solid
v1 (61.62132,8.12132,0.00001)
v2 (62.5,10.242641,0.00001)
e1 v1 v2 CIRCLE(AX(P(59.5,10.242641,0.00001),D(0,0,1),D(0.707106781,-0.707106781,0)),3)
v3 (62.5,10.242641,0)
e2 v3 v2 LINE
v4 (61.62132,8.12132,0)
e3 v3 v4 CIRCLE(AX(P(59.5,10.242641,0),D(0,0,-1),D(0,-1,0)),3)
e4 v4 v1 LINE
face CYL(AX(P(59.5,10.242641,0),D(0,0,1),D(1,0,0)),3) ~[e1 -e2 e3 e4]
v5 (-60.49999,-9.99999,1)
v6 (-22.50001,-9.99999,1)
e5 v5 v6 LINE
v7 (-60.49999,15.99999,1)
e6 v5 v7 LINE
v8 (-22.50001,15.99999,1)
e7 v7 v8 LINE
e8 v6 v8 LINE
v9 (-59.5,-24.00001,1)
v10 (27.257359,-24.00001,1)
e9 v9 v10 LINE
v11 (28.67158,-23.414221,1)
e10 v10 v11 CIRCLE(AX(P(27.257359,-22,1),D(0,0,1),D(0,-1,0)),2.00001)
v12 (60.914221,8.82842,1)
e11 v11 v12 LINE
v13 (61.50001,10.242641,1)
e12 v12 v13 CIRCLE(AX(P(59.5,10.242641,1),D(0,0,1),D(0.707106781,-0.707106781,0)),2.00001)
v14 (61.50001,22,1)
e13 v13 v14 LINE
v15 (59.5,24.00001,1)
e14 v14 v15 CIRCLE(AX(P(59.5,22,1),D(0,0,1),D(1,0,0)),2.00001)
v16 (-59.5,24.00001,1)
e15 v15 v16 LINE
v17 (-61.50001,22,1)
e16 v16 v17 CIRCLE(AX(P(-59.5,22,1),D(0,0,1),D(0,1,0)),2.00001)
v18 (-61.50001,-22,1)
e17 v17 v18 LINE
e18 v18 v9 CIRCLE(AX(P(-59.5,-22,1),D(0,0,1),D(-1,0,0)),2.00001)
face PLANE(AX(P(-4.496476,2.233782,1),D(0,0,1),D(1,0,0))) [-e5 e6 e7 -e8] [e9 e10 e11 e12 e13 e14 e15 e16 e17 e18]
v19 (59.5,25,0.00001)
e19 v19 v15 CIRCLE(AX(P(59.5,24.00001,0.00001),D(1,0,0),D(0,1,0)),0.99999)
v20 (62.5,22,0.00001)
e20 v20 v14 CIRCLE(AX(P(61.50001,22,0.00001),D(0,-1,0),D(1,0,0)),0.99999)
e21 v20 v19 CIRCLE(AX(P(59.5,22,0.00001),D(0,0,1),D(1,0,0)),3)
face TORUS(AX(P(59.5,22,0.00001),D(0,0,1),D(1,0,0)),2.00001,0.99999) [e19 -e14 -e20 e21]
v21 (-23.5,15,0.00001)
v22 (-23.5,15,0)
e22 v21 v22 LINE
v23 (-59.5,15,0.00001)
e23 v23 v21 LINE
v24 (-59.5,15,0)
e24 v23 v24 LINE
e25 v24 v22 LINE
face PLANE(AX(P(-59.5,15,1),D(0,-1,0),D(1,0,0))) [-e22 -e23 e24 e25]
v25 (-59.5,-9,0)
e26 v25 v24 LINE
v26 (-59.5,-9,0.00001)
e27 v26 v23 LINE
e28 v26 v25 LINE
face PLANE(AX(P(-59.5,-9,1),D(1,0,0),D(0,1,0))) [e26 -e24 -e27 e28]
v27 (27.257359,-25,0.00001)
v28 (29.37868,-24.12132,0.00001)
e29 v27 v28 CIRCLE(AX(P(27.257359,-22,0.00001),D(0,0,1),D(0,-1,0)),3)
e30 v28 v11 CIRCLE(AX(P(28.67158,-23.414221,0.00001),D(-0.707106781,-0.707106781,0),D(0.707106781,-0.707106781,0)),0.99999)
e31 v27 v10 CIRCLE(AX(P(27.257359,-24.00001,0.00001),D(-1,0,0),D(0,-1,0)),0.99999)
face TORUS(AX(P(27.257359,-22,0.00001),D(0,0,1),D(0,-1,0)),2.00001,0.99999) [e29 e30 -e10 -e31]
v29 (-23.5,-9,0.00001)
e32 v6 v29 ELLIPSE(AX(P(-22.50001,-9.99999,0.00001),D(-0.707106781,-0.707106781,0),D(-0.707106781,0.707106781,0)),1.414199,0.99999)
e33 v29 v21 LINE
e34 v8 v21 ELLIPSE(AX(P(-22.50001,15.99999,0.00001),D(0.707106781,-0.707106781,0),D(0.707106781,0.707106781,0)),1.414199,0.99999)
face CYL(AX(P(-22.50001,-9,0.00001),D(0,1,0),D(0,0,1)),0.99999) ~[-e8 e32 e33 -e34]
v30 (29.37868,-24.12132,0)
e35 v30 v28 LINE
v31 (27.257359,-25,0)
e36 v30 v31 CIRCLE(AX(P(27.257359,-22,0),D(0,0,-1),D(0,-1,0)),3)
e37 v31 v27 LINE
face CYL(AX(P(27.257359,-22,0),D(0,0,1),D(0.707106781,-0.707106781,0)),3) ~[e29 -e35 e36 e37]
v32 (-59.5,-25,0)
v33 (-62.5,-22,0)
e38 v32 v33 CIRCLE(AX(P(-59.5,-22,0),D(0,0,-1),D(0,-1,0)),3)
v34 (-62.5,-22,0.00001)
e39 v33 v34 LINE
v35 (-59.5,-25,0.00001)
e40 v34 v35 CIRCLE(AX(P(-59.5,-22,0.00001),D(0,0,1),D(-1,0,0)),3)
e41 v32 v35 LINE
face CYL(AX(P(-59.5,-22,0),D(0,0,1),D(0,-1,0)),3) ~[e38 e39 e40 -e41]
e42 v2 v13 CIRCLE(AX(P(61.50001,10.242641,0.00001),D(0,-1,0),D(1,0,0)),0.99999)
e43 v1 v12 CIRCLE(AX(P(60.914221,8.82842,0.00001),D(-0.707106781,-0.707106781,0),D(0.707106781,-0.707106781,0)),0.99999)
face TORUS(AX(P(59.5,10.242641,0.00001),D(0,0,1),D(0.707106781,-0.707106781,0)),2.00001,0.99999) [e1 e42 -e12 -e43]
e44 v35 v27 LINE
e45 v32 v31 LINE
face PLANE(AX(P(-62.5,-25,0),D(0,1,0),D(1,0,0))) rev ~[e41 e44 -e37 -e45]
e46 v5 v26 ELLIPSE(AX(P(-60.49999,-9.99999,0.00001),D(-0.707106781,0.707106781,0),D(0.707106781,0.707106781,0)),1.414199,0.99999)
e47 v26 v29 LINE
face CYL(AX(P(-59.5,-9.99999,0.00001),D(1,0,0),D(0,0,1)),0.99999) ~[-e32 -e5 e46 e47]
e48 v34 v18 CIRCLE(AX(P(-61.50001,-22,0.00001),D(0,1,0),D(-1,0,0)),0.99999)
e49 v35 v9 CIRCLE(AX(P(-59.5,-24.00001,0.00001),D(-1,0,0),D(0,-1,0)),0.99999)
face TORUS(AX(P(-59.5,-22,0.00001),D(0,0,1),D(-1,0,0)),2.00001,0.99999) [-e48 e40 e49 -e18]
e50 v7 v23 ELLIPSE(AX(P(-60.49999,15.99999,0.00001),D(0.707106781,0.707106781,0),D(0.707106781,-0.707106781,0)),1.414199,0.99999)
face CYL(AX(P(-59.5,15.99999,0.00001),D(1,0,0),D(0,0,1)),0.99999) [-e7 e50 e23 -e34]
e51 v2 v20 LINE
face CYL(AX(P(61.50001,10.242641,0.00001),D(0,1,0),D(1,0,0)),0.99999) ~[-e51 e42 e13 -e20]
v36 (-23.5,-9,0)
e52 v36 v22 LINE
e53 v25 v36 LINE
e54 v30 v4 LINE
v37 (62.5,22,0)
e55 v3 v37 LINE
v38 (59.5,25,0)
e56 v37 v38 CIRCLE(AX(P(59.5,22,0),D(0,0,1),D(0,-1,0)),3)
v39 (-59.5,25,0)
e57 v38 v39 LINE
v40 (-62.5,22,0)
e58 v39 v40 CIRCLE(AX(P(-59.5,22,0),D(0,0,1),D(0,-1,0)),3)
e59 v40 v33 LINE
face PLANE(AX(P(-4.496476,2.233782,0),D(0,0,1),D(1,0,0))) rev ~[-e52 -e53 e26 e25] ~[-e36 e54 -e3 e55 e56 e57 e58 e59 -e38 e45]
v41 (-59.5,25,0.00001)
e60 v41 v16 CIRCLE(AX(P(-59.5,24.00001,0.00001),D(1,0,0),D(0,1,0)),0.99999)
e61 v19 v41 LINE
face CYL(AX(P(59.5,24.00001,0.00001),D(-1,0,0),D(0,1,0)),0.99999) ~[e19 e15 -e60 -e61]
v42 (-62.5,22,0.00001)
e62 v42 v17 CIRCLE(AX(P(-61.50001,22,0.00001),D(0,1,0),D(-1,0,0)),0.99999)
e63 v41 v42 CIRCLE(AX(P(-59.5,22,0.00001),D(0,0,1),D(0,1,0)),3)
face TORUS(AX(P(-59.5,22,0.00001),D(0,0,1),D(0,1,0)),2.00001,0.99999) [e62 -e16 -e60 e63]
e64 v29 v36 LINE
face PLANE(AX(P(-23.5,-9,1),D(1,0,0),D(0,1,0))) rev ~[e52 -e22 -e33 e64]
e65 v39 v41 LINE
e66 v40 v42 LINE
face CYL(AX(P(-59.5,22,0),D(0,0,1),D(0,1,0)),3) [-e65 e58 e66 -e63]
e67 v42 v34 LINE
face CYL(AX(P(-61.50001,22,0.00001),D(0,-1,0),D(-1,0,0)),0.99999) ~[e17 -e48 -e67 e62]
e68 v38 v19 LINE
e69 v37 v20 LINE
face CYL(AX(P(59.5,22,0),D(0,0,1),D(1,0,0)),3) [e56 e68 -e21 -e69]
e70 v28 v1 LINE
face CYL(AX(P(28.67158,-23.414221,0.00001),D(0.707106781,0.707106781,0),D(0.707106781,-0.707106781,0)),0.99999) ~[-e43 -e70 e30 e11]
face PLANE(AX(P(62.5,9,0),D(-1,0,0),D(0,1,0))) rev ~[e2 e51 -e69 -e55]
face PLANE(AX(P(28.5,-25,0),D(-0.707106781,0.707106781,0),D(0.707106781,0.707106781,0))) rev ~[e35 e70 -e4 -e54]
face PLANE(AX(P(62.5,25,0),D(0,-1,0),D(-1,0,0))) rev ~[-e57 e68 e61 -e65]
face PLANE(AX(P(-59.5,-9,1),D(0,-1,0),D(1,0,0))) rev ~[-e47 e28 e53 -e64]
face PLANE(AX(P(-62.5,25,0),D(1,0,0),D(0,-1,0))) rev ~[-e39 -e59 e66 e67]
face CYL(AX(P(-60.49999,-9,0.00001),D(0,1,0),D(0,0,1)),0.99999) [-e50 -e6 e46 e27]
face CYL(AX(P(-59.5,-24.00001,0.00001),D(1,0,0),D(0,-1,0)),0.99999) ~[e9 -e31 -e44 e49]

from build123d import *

# Parameters (mm, degrees)
F1_DEPTH = 1
F2_W     = 36
F2_H     = 24
F3_DEPTH = 25
F4_R     = 3
F5_R     = 0.99999


# Not quite as in the source:
# - a fillet or chamfer is up to 0.001 mm smaller than in the source, because OpenCascade refuses the exact size


with BuildPart() as f1:
    # F0 (on Top) → F1 (new body)
    with BuildSketch(Plane.XY):
        Polygon((62.5, 9), (62.5, 25), (-62.5, 25), (-62.5, -25), (28.5, -25), align=None)
    extrude(amount=F1_DEPTH)

    # F2 (on face) → F3 (cut)
    with BuildSketch(Plane.XY.offset(1)):
        with Locations((-41.5, 3)):
            Rectangle(F2_W, F2_H)
    extrude(amount=-F3_DEPTH, mode=Mode.SUBTRACT)

    # F4
    f4_edges = [f1.edges().sort_by_distance(p)[0] for p in [
        (-62.5, 25, 0.5),
        (-62.5, -25, 0.5),
        (62.5, 25, 0.5),
        (28.5, -25, 0.5),
        (62.5, 9, 0.5),
    ]]
    fillet(f4_edges, radius=F4_R)

    # F5 (radius 1 in the source; OpenCascade refuses exactly that, so slightly less here)
    f5_edges = [f1.edges().sort_by_distance(p)[0] for p in [
        (62.5, 16.12132, 1),
        (62.271639, 9.09459, 1),
        (61.62132, 24.12132, 1),
        (45.5, -8, 1),
        (0, 25, 1),
        (28.40541, -24.771639, 1),
        (-61.62132, 24.12132, 1),
        (-16.12132, -25, 1),
        (-62.5, 0, 1),
        (-61.62132, -24.12132, 1),
        (-23.5, 3, 1),
        (-41.5, 15, 1),
        (-59.5, 3, 1),
        (-41.5, -9, 1),
    ]]
    fillet(f5_edges, radius=F5_R)


solid = f1.part
